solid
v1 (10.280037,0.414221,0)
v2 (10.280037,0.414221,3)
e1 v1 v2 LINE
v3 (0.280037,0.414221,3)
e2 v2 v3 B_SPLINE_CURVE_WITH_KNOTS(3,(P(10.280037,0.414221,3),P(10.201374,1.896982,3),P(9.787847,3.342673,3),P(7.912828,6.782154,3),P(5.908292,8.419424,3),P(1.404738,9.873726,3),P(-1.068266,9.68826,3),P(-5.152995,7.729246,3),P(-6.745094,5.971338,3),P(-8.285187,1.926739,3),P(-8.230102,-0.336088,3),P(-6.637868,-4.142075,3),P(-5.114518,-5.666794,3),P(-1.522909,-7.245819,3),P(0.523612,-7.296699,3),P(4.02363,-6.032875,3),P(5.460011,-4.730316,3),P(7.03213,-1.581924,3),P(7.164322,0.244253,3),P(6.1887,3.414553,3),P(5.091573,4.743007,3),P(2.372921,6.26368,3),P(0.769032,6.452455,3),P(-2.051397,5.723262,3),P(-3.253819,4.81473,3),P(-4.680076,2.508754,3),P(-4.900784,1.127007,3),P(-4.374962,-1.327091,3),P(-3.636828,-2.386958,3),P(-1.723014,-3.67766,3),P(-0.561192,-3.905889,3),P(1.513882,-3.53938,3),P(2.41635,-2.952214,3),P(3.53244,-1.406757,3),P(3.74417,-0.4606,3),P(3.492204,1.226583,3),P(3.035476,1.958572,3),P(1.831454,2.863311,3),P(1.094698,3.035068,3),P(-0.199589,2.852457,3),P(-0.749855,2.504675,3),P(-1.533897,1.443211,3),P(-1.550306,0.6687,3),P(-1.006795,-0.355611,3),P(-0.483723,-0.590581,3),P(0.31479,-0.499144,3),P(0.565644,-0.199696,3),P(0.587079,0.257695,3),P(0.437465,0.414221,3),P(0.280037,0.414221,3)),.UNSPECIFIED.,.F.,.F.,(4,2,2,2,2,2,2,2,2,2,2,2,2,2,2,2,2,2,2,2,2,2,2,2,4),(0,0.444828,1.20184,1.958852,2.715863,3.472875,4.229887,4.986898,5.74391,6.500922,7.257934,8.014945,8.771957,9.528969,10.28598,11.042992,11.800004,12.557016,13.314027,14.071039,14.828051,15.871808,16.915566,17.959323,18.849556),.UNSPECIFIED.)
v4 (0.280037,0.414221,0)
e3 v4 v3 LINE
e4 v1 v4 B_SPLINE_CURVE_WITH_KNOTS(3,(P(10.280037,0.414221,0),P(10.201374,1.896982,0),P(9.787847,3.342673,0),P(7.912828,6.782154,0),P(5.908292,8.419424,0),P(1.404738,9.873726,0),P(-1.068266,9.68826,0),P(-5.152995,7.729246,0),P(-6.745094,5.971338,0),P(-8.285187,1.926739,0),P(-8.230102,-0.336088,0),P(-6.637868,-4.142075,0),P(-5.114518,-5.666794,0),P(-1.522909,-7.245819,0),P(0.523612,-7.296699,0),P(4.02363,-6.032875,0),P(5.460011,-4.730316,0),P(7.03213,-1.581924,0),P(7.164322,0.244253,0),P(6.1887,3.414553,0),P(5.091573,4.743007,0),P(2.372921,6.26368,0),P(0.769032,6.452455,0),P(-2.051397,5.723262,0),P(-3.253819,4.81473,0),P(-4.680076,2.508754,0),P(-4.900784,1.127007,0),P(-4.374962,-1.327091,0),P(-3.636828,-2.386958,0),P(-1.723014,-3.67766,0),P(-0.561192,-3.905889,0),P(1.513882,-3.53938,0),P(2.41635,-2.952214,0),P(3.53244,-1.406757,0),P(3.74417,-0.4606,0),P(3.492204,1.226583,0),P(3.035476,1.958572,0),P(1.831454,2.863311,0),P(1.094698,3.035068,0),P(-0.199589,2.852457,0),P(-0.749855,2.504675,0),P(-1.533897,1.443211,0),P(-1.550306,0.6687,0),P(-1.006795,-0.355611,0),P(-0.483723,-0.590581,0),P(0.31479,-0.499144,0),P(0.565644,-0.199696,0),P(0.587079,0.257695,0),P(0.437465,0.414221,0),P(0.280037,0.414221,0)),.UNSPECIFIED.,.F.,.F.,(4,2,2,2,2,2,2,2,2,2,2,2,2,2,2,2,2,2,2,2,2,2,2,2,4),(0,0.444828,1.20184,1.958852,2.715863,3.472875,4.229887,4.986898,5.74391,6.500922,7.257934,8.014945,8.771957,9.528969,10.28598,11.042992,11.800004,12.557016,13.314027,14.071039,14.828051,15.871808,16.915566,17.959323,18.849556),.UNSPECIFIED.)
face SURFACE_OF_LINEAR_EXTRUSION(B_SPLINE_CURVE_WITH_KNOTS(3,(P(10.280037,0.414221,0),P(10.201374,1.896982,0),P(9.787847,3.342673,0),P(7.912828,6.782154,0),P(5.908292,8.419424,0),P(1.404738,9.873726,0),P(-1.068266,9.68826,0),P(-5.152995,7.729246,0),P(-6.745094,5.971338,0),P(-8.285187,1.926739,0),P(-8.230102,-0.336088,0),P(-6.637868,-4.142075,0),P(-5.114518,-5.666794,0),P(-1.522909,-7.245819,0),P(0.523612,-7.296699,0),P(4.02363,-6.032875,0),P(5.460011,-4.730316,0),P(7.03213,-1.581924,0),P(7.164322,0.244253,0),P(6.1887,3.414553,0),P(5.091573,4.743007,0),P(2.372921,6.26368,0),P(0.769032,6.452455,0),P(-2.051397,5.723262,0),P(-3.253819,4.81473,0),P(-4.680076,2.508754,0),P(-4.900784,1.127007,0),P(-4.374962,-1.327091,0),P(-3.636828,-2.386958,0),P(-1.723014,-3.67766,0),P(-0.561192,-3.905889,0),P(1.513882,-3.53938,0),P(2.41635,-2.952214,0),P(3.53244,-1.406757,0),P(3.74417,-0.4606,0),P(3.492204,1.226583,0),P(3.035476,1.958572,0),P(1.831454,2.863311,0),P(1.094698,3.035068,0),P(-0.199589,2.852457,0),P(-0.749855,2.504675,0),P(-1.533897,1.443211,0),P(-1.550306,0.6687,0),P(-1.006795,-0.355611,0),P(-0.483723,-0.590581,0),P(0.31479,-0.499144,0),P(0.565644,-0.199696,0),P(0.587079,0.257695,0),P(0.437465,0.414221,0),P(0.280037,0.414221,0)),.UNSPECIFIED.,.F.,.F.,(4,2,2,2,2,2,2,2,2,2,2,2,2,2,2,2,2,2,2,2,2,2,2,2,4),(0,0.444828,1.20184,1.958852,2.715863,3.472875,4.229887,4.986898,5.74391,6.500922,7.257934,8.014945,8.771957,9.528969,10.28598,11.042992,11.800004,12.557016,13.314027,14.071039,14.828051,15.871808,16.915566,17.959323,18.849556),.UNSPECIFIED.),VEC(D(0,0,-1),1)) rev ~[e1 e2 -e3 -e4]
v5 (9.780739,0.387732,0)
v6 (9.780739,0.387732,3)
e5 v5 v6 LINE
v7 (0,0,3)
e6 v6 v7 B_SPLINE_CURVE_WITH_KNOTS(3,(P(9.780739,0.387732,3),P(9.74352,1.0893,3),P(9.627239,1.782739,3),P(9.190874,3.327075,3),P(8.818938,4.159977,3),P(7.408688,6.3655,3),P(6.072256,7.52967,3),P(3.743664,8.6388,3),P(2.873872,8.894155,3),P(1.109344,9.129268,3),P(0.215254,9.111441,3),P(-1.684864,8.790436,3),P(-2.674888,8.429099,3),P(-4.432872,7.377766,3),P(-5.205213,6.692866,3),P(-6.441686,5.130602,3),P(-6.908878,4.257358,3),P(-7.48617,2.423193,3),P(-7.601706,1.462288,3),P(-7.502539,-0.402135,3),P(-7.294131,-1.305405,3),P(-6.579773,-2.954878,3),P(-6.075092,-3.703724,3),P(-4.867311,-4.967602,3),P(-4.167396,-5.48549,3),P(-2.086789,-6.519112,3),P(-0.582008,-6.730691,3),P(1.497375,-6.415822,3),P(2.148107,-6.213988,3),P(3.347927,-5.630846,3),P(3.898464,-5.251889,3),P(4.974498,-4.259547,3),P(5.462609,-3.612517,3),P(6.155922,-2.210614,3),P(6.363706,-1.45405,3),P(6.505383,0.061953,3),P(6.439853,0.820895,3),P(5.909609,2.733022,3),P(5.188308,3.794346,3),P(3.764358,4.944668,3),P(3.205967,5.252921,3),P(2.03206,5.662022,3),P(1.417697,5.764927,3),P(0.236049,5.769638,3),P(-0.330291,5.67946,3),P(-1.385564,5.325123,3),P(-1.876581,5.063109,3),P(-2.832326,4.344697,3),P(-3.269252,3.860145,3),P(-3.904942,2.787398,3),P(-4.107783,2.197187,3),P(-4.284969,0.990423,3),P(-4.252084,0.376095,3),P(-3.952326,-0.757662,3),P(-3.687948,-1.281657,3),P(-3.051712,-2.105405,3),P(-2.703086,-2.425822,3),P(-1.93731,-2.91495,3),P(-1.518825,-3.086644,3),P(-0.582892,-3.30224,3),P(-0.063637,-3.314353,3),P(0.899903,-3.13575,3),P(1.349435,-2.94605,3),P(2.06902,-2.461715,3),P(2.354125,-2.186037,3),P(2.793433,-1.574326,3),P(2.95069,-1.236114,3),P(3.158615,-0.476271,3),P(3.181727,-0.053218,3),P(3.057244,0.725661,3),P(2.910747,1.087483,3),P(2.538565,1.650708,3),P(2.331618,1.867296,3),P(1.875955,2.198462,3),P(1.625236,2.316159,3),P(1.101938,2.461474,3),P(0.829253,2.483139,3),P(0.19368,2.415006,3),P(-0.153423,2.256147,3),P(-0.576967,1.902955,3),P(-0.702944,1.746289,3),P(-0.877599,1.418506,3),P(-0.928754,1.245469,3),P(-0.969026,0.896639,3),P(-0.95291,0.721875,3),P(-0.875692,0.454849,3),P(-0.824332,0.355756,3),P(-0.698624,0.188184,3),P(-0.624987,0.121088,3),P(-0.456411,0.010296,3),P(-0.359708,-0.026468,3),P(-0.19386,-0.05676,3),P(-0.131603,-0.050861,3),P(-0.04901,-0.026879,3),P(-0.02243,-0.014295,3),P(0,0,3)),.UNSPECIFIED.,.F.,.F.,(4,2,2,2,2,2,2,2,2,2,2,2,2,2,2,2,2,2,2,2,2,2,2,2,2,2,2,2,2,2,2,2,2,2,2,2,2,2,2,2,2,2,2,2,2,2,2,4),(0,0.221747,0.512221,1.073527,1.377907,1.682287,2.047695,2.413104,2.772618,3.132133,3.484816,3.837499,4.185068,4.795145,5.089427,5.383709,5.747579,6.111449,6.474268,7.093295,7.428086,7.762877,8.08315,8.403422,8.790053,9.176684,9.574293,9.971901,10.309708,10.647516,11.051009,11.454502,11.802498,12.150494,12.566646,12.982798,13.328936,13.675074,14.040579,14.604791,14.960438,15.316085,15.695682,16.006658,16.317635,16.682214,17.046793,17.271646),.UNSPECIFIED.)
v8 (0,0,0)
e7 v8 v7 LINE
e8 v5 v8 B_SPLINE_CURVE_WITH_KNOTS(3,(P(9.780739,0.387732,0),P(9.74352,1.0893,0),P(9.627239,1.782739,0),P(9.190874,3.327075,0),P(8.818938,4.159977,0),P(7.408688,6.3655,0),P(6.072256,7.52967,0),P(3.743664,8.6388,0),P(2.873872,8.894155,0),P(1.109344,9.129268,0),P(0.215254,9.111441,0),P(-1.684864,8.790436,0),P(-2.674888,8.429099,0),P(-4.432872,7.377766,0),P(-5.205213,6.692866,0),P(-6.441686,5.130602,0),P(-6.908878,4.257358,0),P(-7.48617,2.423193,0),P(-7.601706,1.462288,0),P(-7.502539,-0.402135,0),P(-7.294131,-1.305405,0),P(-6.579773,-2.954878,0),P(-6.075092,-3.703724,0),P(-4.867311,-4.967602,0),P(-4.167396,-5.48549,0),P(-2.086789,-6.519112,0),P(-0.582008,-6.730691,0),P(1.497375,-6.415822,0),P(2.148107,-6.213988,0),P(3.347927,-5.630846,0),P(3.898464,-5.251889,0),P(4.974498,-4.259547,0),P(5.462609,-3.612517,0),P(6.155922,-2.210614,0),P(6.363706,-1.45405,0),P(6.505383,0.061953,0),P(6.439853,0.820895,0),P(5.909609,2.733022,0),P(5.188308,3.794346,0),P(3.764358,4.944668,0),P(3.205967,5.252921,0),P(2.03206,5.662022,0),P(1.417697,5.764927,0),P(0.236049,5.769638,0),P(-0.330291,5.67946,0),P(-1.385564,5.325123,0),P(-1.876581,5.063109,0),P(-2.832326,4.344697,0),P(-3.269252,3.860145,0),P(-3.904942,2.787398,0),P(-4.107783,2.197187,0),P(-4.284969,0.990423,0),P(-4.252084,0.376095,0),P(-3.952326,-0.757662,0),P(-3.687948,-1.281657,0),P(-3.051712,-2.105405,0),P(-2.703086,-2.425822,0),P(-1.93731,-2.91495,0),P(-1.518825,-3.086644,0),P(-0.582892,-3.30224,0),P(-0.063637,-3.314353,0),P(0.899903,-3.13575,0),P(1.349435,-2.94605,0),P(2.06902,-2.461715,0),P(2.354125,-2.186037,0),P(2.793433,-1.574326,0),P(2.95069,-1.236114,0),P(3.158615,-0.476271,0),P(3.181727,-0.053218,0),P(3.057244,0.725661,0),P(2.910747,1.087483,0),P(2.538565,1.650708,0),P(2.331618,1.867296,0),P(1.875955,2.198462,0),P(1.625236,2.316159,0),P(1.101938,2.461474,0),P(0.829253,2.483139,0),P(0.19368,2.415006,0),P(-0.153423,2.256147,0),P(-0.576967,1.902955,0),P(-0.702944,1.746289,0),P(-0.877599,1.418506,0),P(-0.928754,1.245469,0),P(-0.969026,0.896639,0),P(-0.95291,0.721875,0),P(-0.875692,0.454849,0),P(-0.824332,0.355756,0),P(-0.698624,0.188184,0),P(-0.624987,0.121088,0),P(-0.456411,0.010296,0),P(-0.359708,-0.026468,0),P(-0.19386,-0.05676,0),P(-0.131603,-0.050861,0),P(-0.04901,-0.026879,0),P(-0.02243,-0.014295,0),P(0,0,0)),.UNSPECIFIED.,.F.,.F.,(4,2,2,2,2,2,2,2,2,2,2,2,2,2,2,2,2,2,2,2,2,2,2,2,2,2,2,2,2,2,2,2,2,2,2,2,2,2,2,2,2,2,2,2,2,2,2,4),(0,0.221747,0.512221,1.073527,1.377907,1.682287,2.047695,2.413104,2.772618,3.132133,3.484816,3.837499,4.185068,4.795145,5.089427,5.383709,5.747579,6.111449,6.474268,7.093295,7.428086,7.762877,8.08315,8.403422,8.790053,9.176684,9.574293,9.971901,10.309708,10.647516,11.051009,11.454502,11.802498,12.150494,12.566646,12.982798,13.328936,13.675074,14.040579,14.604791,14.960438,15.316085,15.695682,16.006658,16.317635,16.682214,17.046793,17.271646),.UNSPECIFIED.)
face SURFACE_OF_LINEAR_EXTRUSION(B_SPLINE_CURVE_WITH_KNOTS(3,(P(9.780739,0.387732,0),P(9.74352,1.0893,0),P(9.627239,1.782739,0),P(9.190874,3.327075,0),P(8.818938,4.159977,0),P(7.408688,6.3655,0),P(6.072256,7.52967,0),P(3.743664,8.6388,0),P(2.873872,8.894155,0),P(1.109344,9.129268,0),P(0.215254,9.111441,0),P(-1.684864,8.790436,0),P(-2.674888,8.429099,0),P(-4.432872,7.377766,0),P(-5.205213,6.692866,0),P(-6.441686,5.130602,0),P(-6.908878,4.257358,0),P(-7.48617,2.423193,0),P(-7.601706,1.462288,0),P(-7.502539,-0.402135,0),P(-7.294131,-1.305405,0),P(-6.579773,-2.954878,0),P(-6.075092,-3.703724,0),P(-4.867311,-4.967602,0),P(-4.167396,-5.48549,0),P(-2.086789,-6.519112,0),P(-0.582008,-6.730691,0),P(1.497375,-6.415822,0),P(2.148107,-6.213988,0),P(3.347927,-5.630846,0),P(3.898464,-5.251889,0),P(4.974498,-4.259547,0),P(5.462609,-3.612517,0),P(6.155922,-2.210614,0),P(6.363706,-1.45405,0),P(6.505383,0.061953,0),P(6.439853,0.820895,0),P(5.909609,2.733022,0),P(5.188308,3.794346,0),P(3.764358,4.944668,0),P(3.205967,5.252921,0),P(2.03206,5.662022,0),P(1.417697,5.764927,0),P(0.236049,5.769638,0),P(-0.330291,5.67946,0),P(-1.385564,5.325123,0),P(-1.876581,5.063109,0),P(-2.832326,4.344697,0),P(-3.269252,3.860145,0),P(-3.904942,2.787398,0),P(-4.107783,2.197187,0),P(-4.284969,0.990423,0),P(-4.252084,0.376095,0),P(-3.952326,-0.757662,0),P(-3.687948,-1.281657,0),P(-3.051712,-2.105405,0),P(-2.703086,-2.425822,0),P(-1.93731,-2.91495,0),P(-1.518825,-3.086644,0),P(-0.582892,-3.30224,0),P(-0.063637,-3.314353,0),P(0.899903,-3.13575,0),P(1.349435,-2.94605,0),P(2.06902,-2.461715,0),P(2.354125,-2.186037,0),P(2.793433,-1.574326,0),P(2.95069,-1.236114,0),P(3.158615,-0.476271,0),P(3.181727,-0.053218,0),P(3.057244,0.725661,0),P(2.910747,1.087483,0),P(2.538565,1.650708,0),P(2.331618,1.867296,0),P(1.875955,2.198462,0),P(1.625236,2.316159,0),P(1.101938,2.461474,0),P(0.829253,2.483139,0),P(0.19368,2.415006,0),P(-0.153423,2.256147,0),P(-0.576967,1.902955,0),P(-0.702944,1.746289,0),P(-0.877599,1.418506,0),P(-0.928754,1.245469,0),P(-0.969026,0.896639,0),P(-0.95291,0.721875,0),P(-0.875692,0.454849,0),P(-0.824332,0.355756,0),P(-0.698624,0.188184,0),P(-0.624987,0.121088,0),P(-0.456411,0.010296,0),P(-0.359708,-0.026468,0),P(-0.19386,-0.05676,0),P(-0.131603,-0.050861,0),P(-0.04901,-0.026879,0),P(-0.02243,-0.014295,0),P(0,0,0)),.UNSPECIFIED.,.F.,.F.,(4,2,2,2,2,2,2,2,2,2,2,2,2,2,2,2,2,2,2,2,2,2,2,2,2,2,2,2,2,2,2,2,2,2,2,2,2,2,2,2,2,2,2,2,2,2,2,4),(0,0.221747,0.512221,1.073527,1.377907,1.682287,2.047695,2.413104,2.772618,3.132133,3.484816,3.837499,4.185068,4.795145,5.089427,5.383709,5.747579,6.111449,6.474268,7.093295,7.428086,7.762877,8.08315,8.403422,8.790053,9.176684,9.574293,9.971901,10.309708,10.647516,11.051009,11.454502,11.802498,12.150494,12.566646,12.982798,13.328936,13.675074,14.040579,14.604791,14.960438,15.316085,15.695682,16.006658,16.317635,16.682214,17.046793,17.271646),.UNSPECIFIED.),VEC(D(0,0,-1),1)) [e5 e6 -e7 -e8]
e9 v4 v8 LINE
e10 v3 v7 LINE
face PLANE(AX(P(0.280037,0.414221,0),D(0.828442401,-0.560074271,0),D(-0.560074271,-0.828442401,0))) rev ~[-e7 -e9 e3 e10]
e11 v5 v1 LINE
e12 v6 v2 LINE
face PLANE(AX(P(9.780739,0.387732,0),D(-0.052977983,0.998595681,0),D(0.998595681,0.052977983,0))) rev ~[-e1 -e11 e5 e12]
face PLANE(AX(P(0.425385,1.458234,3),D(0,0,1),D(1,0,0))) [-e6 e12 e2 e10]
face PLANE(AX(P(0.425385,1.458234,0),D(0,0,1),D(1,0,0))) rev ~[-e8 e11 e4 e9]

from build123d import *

# Parameters (mm, degrees)
F1_DEPTH = 3


# Not quite as in the source:
# - the dataset's text gives a spline's control points without its knots; the knots are read off the source's solid


with BuildPart() as f1:
    # F0 (on Top) → F1 (new body)
    with BuildSketch(Plane.XY):
        with BuildLine():
            Line((9.780739, 0.387732), (10.280037, 0.414221))
            add(Edge.make_bspline(
                [(10.280037, 0.414221), (10.201374, 1.896982), (9.787847, 3.342673), (7.912828, 6.782154), (5.908292, 8.419424), (1.404738, 9.873726), (-1.068266, 9.68826), (-5.152995, 7.729246), (-6.745094, 5.971338), (-8.285187, 1.926739), (-8.230102, -0.336088), (-6.637868, -4.142075), (-5.114518, -5.666794), (-1.522909, -7.245819), (0.523612, -7.296699), (4.02363, -6.032875), (5.460011, -4.730316), (7.03213, -1.581924), (7.164322, 0.244253), (6.1887, 3.414553), (5.091573, 4.743007), (2.372921, 6.26368), (0.769032, 6.452455), (-2.051397, 5.723262), (-3.253819, 4.81473), (-4.680076, 2.508754), (-4.900784, 1.127007), (-4.374962, -1.327091), (-3.636828, -2.386958), (-1.723014, -3.67766), (-0.561192, -3.905889), (1.513882, -3.53938), (2.41635, -2.952214), (3.53244, -1.406757), (3.74417, -0.4606), (3.492204, 1.226583), (3.035476, 1.958572), (1.831454, 2.863311), (1.094698, 3.035068), (-0.199589, 2.852457), (-0.749855, 2.504675), (-1.533897, 1.443211), (-1.550306, 0.6687), (-1.006795, -0.355611), (-0.483723, -0.590581), (0.31479, -0.499144), (0.565644, -0.199696), (0.587079, 0.257695), (0.437465, 0.414221), (0.280037, 0.414221)],
                knots=[0, 0, 0, 0, 0.444828, 0.444828, 1.20184, 1.20184, 1.958852, 1.958852, 2.715863, 2.715863, 3.472875, 3.472875, 4.229887, 4.229887, 4.986898, 4.986898, 5.74391, 5.74391, 6.500922, 6.500922, 7.257934, 7.257934, 8.014945, 8.014945, 8.771957, 8.771957, 9.528969, 9.528969, 10.28598, 10.28598, 11.042992, 11.042992, 11.800004, 11.800004, 12.557016, 12.557016, 13.314027, 13.314027, 14.071039, 14.071039, 14.828051, 14.828051, 15.871808, 15.871808, 16.915566, 16.915566, 17.959323, 17.959323, 18.849556, 18.849556, 18.849556, 18.849556], degree=3))
            Line((0.280037, 0.414221), (0, 0))
            add(Edge.make_bspline(
                [(9.780739, 0.387732), (9.74352, 1.0893), (9.627239, 1.782739), (9.190874, 3.327075), (8.818938, 4.159977), (7.408688, 6.3655), (6.072256, 7.52967), (3.743664, 8.6388), (2.873872, 8.894155), (1.109344, 9.129268), (0.215254, 9.111441), (-1.684864, 8.790436), (-2.674888, 8.429099), (-4.432872, 7.377766), (-5.205213, 6.692866), (-6.441686, 5.130602), (-6.908878, 4.257358), (-7.48617, 2.423193), (-7.601706, 1.462288), (-7.502539, -0.402135), (-7.294131, -1.305405), (-6.579773, -2.954878), (-6.075092, -3.703724), (-4.867311, -4.967602), (-4.167396, -5.48549), (-2.086789, -6.519112), (-0.582008, -6.730691), (1.497375, -6.415822), (2.148107, -6.213988), (3.347927, -5.630846), (3.898464, -5.251889), (4.974498, -4.259547), (5.462609, -3.612517), (6.155922, -2.210614), (6.363706, -1.45405), (6.505383, 0.061953), (6.439853, 0.820895), (5.909609, 2.733022), (5.188308, 3.794346), (3.764358, 4.944668), (3.205967, 5.252921), (2.03206, 5.662022), (1.417697, 5.764927), (0.236049, 5.769638), (-0.330291, 5.67946), (-1.385564, 5.325123), (-1.876581, 5.063109), (-2.832326, 4.344697), (-3.269252, 3.860145), (-3.904942, 2.787398), (-4.107783, 2.197187), (-4.284969, 0.990423), (-4.252084, 0.376095), (-3.952326, -0.757662), (-3.687948, -1.281657), (-3.051712, -2.105405), (-2.703086, -2.425822), (-1.93731, -2.91495), (-1.518825, -3.086644), (-0.582892, -3.30224), (-0.063637, -3.314353), (0.899903, -3.13575), (1.349435, -2.94605), (2.06902, -2.461715), (2.354125, -2.186037), (2.793433, -1.574326), (2.95069, -1.236114), (3.158615, -0.476271), (3.181727, -0.053218), (3.057244, 0.725661), (2.910747, 1.087483), (2.538565, 1.650708), (2.331618, 1.867296), (1.875955, 2.198462), (1.625236, 2.316159), (1.101938, 2.461474), (0.829253, 2.483139), (0.19368, 2.415006), (-0.153423, 2.256147), (-0.576967, 1.902955), (-0.702944, 1.746289), (-0.877599, 1.418506), (-0.928754, 1.245469), (-0.969026, 0.896639), (-0.95291, 0.721875), (-0.875692, 0.454849), (-0.824332, 0.355756), (-0.698624, 0.188184), (-0.624987, 0.121088), (-0.456411, 0.010296), (-0.359708, -0.026468), (-0.19386, -0.05676), (-0.131603, -0.050861), (-0.04901, -0.026879), (-0.02243, -0.014295), (0, 0)],
                knots=[0, 0, 0, 0, 0.221747, 0.221747, 0.512221, 0.512221, 1.073527, 1.073527, 1.377907, 1.377907, 1.682287, 1.682287, 2.047695, 2.047695, 2.413104, 2.413104, 2.772618, 2.772618, 3.132133, 3.132133, 3.484816, 3.484816, 3.837499, 3.837499, 4.185068, 4.185068, 4.795145, 4.795145, 5.089427, 5.089427, 5.383709, 5.383709, 5.747579, 5.747579, 6.111449, 6.111449, 6.474268, 6.474268, 7.093295, 7.093295, 7.428086, 7.428086, 7.762877, 7.762877, 8.08315, 8.08315, 8.403422, 8.403422, 8.790053, 8.790053, 9.176684, 9.176684, 9.574293, 9.574293, 9.971901, 9.971901, 10.309708, 10.309708, 10.647516, 10.647516, 11.051009, 11.051009, 11.454502, 11.454502, 11.802498, 11.802498, 12.150494, 12.150494, 12.566646, 12.566646, 12.982798, 12.982798, 13.328936, 13.328936, 13.675074, 13.675074, 14.040579, 14.040579, 14.604791, 14.604791, 14.960438, 14.960438, 15.316085, 15.316085, 15.695682, 15.695682, 16.006658, 16.006658, 16.317635, 16.317635, 16.682214, 16.682214, 17.046793, 17.046793, 17.271646, 17.271646, 17.271646, 17.271646], degree=3))
        make_face()
    extrude(amount=F1_DEPTH)


solid = f1.part
